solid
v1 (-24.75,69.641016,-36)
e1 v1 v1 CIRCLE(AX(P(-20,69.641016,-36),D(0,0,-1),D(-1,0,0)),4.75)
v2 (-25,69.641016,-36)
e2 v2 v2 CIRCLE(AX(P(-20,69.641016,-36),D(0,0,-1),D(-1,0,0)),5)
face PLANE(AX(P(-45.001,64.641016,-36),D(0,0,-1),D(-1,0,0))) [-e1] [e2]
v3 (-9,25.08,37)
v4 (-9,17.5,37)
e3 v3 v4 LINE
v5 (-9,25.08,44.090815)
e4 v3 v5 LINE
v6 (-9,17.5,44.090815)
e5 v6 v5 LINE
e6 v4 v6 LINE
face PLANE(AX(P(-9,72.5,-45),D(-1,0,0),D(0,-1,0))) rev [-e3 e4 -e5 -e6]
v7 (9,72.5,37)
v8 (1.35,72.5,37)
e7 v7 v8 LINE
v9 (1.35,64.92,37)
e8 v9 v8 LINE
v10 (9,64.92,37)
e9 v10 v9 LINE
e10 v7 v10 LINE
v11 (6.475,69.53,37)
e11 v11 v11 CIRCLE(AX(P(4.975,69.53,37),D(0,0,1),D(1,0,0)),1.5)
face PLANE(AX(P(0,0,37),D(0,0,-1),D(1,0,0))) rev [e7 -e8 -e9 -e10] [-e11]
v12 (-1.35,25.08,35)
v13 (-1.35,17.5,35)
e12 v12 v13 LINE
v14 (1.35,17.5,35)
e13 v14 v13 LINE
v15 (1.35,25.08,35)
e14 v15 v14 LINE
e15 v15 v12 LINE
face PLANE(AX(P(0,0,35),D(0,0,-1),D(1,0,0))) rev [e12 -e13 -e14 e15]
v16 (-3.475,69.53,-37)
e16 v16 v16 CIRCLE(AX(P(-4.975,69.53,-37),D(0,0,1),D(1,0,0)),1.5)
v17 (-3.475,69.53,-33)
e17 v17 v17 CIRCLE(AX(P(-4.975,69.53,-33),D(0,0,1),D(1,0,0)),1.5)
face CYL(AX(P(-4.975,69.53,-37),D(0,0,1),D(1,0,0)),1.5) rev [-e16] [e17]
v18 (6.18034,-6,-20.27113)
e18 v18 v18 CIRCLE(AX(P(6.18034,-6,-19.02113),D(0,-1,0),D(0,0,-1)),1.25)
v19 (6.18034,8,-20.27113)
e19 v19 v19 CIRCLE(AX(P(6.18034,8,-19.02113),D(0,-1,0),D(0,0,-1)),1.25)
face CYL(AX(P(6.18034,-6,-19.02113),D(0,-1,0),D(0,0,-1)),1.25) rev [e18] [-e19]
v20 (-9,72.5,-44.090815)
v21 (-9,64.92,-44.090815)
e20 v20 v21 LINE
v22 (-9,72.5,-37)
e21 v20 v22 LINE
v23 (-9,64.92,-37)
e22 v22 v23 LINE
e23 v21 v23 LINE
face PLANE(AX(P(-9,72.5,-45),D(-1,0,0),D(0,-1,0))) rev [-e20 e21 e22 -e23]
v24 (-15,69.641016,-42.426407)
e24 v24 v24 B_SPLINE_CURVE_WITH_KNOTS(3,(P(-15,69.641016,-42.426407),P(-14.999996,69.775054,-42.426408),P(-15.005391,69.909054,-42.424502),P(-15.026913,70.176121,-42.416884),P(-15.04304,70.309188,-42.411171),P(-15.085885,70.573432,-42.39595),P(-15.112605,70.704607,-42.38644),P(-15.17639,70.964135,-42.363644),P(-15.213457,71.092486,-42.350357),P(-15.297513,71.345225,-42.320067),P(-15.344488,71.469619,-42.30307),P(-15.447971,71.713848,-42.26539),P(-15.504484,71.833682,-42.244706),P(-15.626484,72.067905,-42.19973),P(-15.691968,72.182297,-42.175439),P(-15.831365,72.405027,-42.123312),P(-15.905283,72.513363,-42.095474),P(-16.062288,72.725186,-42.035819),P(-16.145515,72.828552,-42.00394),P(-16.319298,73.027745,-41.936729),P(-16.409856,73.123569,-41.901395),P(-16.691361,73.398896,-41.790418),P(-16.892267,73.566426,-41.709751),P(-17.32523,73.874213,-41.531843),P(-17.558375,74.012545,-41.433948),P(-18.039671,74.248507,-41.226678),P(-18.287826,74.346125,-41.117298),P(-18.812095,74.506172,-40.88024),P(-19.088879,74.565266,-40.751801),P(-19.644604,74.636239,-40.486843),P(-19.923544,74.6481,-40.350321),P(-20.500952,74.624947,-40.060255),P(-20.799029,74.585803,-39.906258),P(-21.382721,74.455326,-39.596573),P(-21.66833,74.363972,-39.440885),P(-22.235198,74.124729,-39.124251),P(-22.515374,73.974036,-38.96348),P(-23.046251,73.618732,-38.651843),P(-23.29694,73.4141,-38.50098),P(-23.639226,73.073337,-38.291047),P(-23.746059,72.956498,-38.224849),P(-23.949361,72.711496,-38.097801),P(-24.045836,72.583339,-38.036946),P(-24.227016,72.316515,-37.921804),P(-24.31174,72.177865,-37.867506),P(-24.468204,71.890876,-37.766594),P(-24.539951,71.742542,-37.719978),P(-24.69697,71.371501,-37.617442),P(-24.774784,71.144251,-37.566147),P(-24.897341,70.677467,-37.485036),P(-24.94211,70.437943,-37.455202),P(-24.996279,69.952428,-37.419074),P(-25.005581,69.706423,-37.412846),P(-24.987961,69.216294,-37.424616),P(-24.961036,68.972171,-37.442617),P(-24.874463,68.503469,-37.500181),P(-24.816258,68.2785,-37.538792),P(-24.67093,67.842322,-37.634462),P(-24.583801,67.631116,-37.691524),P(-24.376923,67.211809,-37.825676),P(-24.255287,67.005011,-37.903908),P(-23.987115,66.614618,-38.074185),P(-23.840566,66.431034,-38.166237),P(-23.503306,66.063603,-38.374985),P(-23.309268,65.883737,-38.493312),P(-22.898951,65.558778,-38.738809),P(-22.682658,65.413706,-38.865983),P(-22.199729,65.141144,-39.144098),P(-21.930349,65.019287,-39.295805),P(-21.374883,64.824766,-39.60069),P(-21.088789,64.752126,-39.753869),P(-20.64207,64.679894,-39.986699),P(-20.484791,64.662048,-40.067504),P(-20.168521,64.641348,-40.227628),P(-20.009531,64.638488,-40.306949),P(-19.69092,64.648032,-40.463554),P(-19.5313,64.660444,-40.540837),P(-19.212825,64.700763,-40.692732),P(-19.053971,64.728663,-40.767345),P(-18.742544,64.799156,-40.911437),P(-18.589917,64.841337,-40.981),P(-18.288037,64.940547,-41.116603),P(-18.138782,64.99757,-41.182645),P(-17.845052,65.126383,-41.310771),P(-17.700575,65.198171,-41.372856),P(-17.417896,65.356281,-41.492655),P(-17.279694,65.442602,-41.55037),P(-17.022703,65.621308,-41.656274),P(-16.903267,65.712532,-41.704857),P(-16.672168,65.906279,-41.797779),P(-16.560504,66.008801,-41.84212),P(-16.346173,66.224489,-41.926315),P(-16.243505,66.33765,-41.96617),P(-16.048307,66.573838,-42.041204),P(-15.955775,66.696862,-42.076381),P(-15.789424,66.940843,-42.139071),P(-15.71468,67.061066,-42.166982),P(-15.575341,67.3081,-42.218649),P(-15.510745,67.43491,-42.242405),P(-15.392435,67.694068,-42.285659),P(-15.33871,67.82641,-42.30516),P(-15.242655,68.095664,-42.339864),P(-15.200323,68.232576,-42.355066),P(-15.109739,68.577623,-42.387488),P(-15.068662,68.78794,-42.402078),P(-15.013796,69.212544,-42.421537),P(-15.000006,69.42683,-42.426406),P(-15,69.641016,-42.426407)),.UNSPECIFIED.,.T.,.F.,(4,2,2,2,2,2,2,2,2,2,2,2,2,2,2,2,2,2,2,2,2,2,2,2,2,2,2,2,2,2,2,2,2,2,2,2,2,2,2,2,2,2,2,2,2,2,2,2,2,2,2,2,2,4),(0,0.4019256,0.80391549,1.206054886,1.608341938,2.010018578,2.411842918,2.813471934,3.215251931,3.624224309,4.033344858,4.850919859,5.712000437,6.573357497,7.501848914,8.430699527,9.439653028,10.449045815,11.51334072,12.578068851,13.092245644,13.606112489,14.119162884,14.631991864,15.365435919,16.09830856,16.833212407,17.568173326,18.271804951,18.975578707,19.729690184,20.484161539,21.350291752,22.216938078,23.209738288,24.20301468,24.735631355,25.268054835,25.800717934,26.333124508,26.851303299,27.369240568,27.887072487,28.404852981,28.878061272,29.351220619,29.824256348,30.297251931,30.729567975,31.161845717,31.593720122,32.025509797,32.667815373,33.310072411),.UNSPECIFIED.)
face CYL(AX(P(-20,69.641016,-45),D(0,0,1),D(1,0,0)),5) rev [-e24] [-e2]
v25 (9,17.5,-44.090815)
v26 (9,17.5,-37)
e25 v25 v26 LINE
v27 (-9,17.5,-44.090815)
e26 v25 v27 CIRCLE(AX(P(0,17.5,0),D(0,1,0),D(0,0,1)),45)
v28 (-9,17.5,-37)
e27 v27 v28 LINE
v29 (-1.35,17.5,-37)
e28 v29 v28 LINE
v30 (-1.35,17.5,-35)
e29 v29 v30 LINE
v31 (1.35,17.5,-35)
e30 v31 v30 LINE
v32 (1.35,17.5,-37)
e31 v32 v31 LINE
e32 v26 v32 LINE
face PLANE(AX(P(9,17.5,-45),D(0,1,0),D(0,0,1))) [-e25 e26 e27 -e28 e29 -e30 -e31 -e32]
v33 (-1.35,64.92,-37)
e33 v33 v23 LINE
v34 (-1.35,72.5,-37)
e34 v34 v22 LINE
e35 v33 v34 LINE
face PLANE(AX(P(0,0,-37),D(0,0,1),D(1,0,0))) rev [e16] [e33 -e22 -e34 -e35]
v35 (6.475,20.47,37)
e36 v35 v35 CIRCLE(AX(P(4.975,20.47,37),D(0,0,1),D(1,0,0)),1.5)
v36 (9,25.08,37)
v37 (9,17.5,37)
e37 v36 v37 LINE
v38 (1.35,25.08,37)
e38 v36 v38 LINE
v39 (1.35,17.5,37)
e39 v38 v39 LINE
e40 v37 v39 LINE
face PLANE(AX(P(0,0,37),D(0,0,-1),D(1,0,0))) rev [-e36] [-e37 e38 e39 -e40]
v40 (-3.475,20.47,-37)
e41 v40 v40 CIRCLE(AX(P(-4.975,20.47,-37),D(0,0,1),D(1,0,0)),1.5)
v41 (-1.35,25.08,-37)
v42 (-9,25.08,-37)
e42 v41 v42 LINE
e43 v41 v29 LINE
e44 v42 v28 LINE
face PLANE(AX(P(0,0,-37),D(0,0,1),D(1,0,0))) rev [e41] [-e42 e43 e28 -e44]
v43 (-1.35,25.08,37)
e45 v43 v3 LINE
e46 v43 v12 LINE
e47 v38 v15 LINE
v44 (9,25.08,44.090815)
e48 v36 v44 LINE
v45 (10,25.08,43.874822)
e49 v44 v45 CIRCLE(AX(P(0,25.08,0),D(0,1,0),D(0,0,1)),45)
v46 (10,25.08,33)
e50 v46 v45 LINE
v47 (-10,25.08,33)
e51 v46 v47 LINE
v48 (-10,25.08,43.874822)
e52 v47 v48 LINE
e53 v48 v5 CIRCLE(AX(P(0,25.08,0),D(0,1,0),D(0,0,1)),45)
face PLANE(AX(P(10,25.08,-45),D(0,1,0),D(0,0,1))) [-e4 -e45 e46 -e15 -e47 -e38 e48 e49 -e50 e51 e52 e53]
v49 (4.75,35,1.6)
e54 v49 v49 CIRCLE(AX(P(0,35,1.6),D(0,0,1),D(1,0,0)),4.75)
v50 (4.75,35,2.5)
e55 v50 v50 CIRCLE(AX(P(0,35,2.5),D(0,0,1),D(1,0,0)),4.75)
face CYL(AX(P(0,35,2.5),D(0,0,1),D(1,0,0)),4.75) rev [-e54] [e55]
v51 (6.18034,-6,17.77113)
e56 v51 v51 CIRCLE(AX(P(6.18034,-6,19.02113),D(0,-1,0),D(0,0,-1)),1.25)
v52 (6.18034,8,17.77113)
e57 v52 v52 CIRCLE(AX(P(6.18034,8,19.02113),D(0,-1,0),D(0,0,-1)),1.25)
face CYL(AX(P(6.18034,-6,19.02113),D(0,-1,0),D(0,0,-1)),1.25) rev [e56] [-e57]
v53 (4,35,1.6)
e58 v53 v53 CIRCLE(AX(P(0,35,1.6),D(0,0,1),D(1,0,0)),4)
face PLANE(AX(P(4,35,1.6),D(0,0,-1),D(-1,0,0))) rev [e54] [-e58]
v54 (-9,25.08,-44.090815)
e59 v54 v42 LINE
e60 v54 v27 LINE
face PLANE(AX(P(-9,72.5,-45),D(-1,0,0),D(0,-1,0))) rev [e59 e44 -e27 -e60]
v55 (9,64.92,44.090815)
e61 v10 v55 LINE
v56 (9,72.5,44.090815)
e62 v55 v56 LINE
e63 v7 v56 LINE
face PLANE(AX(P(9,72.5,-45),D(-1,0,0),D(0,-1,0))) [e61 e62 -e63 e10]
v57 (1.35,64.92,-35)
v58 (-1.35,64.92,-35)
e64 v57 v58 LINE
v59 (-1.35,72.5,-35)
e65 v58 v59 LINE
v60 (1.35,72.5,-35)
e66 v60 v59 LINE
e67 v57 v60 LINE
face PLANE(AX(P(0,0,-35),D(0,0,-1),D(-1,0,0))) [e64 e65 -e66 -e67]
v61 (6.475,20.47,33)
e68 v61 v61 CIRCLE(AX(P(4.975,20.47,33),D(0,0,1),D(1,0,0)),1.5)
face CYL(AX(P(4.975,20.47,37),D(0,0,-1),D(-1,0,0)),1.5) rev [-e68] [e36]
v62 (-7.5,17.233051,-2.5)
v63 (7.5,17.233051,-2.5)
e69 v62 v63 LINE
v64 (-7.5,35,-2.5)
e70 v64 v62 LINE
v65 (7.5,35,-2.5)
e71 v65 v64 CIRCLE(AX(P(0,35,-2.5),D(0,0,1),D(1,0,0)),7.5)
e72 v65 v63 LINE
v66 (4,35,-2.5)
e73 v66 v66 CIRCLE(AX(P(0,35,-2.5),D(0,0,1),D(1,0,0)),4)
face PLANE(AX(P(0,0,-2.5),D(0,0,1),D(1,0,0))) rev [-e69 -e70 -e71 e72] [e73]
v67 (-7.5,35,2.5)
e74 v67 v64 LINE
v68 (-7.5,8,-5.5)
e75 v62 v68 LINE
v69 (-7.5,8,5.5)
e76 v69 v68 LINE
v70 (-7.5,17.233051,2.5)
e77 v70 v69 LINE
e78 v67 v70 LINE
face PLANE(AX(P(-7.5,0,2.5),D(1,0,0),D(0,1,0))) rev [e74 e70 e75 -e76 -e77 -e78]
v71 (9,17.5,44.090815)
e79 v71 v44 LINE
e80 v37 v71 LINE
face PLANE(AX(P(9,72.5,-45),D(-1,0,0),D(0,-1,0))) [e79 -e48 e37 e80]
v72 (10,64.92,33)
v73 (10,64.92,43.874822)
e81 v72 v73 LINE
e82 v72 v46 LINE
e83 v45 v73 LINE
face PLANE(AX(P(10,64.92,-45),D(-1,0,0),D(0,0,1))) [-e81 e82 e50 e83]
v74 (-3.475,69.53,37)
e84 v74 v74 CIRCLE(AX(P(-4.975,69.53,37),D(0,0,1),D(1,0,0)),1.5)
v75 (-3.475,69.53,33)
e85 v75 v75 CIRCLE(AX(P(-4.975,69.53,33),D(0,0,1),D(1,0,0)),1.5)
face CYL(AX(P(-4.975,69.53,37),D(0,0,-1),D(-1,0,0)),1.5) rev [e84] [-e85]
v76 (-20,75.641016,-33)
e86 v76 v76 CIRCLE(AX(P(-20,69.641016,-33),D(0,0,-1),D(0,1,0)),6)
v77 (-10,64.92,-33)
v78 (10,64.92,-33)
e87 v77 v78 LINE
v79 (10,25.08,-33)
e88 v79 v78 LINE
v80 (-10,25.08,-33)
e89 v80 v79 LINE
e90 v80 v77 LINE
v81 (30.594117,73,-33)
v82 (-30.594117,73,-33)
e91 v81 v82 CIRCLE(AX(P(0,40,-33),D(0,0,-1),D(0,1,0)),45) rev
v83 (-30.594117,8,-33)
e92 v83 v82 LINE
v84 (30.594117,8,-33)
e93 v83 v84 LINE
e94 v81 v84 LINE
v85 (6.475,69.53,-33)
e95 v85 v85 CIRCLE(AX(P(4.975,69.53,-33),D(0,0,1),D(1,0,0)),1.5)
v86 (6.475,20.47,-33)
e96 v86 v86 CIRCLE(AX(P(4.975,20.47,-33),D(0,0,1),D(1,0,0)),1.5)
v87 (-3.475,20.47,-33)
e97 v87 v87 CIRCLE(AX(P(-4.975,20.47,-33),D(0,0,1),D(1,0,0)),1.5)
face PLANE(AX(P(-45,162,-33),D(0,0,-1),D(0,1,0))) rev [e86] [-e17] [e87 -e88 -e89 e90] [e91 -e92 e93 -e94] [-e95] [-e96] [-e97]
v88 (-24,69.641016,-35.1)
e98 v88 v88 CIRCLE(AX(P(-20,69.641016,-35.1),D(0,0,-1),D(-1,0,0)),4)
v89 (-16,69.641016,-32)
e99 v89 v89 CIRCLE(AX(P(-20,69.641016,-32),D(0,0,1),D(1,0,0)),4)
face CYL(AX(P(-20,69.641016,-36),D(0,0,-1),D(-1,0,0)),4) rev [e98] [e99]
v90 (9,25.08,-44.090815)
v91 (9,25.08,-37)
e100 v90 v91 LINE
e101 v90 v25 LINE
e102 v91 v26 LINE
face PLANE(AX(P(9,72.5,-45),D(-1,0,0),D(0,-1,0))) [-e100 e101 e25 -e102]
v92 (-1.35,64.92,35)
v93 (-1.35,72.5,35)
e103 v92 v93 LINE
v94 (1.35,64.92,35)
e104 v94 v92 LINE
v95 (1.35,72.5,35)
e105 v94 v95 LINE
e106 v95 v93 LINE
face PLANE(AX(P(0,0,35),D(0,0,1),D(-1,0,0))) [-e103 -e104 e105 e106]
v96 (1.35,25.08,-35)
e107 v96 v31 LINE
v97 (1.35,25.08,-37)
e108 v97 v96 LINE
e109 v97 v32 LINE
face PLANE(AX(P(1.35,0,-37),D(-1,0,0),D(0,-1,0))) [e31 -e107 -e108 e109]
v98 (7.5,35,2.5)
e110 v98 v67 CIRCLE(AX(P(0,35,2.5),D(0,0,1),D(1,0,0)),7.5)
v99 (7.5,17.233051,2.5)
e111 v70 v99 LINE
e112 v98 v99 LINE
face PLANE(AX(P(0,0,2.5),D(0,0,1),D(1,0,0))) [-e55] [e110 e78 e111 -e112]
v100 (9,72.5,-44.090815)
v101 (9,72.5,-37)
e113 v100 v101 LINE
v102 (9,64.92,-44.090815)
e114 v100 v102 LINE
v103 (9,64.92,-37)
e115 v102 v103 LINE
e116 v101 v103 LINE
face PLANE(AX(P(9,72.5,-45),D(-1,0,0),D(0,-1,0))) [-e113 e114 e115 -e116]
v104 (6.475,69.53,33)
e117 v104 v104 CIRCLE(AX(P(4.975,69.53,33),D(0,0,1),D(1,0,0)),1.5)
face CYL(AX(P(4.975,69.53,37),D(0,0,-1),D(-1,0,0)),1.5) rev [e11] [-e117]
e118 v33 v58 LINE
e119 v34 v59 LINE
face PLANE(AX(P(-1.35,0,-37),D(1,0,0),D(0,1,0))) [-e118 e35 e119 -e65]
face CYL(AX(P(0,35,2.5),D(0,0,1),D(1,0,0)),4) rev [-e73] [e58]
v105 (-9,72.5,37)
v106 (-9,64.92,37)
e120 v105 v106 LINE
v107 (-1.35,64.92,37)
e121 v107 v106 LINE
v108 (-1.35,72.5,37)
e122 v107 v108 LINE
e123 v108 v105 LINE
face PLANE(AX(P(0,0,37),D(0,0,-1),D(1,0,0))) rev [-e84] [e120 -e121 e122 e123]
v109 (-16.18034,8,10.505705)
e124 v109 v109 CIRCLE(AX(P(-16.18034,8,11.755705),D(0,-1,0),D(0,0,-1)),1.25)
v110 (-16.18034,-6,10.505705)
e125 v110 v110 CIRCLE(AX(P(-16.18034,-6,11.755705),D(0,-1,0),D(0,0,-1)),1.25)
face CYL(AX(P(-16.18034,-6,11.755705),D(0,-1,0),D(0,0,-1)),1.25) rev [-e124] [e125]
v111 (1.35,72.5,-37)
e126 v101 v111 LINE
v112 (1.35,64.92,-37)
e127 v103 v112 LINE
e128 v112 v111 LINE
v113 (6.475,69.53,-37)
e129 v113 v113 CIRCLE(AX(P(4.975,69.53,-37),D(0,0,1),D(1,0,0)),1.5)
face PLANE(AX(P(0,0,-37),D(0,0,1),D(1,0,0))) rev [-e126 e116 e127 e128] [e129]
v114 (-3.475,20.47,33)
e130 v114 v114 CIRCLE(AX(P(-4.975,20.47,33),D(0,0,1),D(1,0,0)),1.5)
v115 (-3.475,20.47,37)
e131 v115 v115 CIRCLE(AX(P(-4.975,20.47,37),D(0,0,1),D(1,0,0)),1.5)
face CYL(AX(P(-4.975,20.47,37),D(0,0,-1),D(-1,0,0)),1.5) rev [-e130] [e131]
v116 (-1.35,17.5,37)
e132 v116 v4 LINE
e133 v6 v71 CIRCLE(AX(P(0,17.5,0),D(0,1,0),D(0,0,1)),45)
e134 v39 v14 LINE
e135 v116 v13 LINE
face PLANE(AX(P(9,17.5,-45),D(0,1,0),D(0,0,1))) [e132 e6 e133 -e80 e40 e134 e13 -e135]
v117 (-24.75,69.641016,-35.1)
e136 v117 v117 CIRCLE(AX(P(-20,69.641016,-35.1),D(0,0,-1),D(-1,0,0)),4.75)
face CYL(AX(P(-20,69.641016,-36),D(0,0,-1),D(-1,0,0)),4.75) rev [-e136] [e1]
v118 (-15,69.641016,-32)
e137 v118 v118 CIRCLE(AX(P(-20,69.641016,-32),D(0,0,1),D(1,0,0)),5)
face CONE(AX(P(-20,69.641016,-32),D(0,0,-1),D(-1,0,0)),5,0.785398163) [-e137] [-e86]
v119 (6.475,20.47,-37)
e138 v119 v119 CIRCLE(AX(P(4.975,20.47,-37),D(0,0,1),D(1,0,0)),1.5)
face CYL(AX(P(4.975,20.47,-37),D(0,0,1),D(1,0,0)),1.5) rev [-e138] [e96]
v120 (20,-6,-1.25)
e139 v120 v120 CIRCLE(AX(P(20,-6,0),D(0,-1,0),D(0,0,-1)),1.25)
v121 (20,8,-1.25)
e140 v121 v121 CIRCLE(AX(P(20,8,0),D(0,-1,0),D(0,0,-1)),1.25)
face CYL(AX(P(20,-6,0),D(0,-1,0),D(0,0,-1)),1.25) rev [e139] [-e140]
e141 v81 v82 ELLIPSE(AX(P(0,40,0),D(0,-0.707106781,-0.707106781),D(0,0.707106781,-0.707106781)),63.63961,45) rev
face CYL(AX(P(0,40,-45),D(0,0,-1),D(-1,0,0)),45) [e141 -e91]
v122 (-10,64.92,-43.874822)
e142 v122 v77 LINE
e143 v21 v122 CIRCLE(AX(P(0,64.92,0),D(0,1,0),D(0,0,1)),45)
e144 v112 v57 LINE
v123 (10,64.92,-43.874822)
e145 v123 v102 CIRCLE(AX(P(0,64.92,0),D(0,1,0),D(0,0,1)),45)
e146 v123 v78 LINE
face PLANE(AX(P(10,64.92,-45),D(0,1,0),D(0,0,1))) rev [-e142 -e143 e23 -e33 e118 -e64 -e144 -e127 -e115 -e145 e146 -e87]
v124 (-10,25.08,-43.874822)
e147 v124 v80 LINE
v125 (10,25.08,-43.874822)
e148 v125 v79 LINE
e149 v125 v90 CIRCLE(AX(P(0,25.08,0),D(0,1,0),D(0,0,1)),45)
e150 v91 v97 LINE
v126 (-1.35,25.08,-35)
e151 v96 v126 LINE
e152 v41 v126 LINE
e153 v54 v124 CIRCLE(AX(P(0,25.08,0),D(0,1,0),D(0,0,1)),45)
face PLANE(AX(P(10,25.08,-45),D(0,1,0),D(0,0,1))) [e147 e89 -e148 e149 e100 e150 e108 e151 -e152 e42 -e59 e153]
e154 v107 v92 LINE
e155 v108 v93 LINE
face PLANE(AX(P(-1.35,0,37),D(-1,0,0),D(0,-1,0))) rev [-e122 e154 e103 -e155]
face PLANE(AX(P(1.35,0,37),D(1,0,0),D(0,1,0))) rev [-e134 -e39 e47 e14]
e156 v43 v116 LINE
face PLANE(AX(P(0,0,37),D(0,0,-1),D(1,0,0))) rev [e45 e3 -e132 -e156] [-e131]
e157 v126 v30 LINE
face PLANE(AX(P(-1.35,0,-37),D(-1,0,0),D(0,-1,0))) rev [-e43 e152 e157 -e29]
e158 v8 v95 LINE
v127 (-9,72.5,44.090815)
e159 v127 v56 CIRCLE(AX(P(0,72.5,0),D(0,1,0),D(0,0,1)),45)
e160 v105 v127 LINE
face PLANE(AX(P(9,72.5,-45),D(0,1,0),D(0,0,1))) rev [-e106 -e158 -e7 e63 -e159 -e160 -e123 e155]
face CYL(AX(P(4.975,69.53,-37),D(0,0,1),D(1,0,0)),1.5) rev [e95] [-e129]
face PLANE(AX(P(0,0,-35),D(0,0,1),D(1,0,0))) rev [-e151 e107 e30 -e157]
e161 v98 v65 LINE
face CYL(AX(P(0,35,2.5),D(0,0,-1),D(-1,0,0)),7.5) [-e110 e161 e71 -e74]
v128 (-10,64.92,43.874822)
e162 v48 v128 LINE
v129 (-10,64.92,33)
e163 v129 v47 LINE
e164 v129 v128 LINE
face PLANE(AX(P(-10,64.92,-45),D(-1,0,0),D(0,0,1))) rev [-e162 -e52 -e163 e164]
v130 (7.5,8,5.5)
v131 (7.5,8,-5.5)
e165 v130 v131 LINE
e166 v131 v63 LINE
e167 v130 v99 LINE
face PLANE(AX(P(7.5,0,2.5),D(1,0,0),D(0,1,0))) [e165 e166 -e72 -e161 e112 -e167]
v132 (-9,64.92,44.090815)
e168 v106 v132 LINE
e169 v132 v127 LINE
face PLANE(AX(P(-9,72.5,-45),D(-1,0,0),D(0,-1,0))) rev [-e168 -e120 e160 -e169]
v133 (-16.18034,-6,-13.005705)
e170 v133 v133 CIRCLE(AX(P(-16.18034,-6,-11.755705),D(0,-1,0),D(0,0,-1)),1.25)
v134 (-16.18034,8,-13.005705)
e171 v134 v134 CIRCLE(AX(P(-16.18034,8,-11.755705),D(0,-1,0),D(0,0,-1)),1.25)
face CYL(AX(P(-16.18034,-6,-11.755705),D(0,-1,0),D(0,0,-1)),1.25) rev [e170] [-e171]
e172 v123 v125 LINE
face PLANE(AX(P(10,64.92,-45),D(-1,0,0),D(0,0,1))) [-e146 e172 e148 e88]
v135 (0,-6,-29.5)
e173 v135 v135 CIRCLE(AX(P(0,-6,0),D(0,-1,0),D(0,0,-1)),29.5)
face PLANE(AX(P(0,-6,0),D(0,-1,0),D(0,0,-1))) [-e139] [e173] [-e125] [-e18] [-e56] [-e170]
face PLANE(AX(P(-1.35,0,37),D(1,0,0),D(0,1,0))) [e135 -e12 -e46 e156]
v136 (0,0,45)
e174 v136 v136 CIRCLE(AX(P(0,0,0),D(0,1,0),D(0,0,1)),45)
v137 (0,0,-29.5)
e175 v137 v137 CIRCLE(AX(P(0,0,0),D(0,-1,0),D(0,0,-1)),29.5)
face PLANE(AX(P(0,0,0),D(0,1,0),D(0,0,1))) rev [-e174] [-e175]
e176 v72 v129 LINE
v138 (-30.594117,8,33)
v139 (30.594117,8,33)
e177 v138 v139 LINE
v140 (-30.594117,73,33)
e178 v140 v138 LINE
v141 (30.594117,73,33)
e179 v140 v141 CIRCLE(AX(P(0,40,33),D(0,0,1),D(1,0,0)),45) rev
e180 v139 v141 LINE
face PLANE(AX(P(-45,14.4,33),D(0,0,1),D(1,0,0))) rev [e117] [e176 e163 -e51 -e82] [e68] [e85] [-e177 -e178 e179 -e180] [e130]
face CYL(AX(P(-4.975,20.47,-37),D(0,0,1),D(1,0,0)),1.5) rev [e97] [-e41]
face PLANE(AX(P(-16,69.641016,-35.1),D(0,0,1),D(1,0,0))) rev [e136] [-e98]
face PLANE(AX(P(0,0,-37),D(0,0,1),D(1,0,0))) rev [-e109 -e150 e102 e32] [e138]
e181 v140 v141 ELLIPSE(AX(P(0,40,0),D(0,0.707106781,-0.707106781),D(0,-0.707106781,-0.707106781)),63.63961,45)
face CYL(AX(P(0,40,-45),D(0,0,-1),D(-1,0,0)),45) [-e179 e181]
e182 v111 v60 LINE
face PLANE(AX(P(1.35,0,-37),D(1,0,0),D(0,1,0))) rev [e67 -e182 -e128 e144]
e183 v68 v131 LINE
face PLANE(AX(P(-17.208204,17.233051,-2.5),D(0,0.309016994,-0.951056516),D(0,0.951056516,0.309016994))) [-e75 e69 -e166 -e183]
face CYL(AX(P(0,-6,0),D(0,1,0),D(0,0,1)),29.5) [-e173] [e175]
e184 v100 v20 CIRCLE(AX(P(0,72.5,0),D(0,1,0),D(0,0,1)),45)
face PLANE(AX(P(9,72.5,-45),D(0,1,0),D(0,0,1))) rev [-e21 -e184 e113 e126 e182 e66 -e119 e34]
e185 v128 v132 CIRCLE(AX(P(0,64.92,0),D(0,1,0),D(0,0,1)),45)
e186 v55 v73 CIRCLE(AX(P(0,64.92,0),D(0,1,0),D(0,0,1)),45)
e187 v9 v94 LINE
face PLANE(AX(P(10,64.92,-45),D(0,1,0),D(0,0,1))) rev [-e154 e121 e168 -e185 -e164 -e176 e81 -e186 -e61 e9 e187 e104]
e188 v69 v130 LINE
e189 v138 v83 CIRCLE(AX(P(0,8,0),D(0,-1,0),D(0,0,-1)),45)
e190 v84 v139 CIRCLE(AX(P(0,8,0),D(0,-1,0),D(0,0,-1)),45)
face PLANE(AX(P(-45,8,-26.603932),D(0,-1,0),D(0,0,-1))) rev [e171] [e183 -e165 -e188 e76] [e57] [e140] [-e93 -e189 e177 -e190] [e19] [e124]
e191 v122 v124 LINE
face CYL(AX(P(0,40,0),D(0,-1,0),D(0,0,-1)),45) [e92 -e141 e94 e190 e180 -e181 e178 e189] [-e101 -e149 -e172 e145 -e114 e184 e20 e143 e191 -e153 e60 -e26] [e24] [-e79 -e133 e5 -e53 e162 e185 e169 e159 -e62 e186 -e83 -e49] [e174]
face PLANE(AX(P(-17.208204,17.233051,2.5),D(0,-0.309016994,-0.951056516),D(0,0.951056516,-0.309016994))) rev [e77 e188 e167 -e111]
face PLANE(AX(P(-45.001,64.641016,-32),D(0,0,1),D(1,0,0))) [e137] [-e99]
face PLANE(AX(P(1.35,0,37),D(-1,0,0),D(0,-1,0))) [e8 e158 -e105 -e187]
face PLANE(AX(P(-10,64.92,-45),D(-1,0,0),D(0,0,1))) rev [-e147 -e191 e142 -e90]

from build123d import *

# Parameters (mm, degrees)
SKETCH_1_R                     = 45
EXTRUDE_1_DEPTH                = 40
REVOLVE_1_ANGLE                = 180
CUT_EXTRUDE_2_DEPTH            = 107.183802908
CUT_EXTRUDE_2_DEPTH_BACK       = 107.183802908
SKETCH_8_R                     = 29.5
EXTRUDE_2_DEPTH                = 6
CUT_EXTRUDE_5_DEPTH            = 124.830529354
CUT_EXTRUDE_5_DEPTH_BACK       = 124.830529354
SKETCH_9_W                     = 18
SKETCH_9_H                     = 55
SKETCH_9_W_2                   = 20
SKETCH_9_H_2                   = 39.84
SKETCH_9_4_W                   = 7.65
SKETCH_9_4_H                   = 7.58
SKETCH_9_4_R                   = 1.5
EXTRUDE_3_DEPTH                = 4
SKETCH_9_5_W                   = 2.7
SKETCH_9_5_H                   = 7.58
EXTRUDE_4_DEPTH                = 2
HOLE_WIZARD_M3_1_D             = 2.5
CUT_EXTRUDE_6_DEPTH            = 107.183802908
CUT_EXTRUDE_6_DEPTH_BACK       = 107.183802908
SKETCH_10_OUTSIDE_W            = 123.292
SKETCH_10_OUTSIDE_H            = 123.292
SKETCH_10_OUTSIDE_R            = 45
SKETCH_14_R                    = 2.5
EXTRUDE_5_DEPTH                = 2.5
EXTRUDE_6_DEPTH                = 15
HOLE_WIZARD_M3_1_2_D           = 8
HOLE_WIZARD_M3_1_2_CBORE_D     = 9.5
HOLE_WIZARD_M3_1_2_CBORE_DEPTH = 0.9
SKETCH_23_R                    = 5
CUT_EXTRUDE_8_DEPTH            = 124.830529354
EXTRUDE_START                  = -36
EXTRUDE_7_OUTLINE_R            = 5
EXTRUDE_7_DEPTH                = 4
HOLE_WIZARD_M5_1_D             = 8
HOLE_WIZARD_M5_1_DEPTH         = 10
HOLE_WIZARD_M5_1_CBORE_D       = 9.5
HOLE_WIZARD_M5_1_CBORE_DEPTH   = 0.9
HOLE_WIZARD_M5_1_TIP           = 2.403442476
CHAMFER_1_SIZE                 = 1


# Read off the part's stored shape, not the designer's step: 凸台-拉伸7
with BuildPart() as part:
    # 草图1 → 凸台-拉伸1 (new body)
    with BuildSketch(Plane(origin=(0, 0, 0), x_dir=(1, 0, 0), z_dir=(0, 1, 0))):
        with Locations(Location((0, 0, 0), (0, 0, 270))):
            Circle(SKETCH_1_R)
    extrude(amount=EXTRUDE_1_DEPTH)

    # 草图3 → 旋转1 (revolve)
    with BuildSketch(Plane(origin=(0, 40, 0), x_dir=(1, 0, 0), z_dir=(0, 1, 0))):
        with BuildLine():
            ThreePointArc((45, 0), (31.819805153, 31.819805153), (0, 45))
            Line((0, 45), (0, 0))
            Line((0, 0), (45, 0))
        make_face()
        with BuildLine():
            Line((45, 0), (0, 0))
            Line((0, 0), (0, -45))
            ThreePointArc((0, -45), (31.819805153, -31.819805153), (45, 0))
        make_face()
        with BuildLine():
            Line((45, 45), (0, 45))
            ThreePointArc((0, 45), (31.819805153, 31.819805153), (45, 0))
            Line((45, 0), (45, 45))
        make_face()
        with BuildLine():
            Line((45, -45), (45, 0))
            ThreePointArc((45, 0), (31.819805153, -31.819805153), (0, -45))
            Line((0, -45), (45, -45))
        make_face()
    revolve(axis=Axis((0, 40, -45), (0, 0, 1)), revolution_arc=REVOLVE_1_ANGLE)

    # 草图4 → 切除-拉伸2 (cut, two sides: drawn at the far end of the back side and taken through both)
    with BuildSketch(Plane(origin=(0, 0, 0), x_dir=(0, 0, -1), z_dir=(1, 0, 0)).offset(-CUT_EXTRUDE_2_DEPTH_BACK)):
        Polygon((33, 162), (-33, 162), (-33, 14.4), (-33, 8), (-26.603931708, 8), (26.603931708, 8), (33, 8), (33, 14.4), align=None)
    extrude(amount=CUT_EXTRUDE_2_DEPTH + CUT_EXTRUDE_2_DEPTH_BACK, mode=Mode.SUBTRACT)

    # 草图8 → 凸台-拉伸2 (add)
    with BuildSketch(Plane.XZ):
        with Locations(Location((0, 0, 0), (0, 0, 270))):
            Circle(SKETCH_8_R)
    extrude(amount=EXTRUDE_2_DEPTH)

    # 草图9 → 切除-拉伸5 (cut, two sides: drawn at the far end of the back side and taken through both)
    with BuildSketch(Plane.XY.offset(-33).offset(-CUT_EXTRUDE_5_DEPTH_BACK)):
        with Locations((0, 45)):
            Rectangle(SKETCH_9_W, SKETCH_9_H)
        with Locations((0, 45)):
            Rectangle(SKETCH_9_W_2, SKETCH_9_H_2)
    extrude(amount=CUT_EXTRUDE_5_DEPTH + CUT_EXTRUDE_5_DEPTH_BACK, mode=Mode.SUBTRACT)

    # 草图9<4> → 凸台-拉伸3 (add)
    # profile 1 of 4: a face of its own
    with BuildSketch(Plane.XY.offset(-33)):
        with Locations((5.175, 21.29)):
            Rectangle(SKETCH_9_4_W, SKETCH_9_4_H)
        with Locations((4.975, 20.47)):
            Circle(SKETCH_9_4_R, mode=Mode.SUBTRACT)
    # profile 2 of 4: a face of its own
    with BuildSketch(Plane.XY.offset(-33)):
        with Locations((-5.175, 21.29)):
            Rectangle(SKETCH_9_4_W, SKETCH_9_4_H)
        with Locations((-4.975, 20.47)):
            Circle(SKETCH_9_4_R, mode=Mode.SUBTRACT)
    # profile 3 of 4: a face of its own
    with BuildSketch(Plane.XY.offset(-33)):
        with Locations((5.175, 68.71)):
            Rectangle(SKETCH_9_4_W, SKETCH_9_4_H)
        with Locations((4.975, 69.53)):
            Circle(SKETCH_9_4_R, mode=Mode.SUBTRACT)
    # profile 4 of 4: a face of its own
    with BuildSketch(Plane.XY.offset(-33)):
        with Locations((-5.175, 68.71)):
            Rectangle(SKETCH_9_4_W, SKETCH_9_4_H)
        with Locations((-4.975, 69.53)):
            Circle(SKETCH_9_4_R, mode=Mode.SUBTRACT)
    extrude_3 = extrude(amount=-EXTRUDE_3_DEPTH)

    # 草图9<5> → 凸台-拉伸4 (add)
    with BuildSketch(Plane.XY.offset(-33)):
        with Locations((0, 21.29)):
            Rectangle(SKETCH_9_5_W, SKETCH_9_5_H)
        with Locations((0, 68.71)):
            Rectangle(SKETCH_9_5_W, SKETCH_9_5_H)
    extrude_4 = extrude(amount=-EXTRUDE_4_DEPTH)

    # 镜向1: 凸台-拉伸3, 凸台-拉伸4 across plane
    add(extrude_3.mirror(Plane.XY))
    add(extrude_4.mirror(Plane.XY))

    # Hole Wizard M3 _1 (through all)
    with Locations(Plane.XZ.offset(6)):
        with Locations((6.180339887, 19.021130326), (20, 0), (6.180339887, -19.021130326), (-16.180339887, -11.755705046), (-16.180339887, 11.755705046)):
            Hole(HOLE_WIZARD_M3_1_D / 2)

    # 草图10 outside → 切除-拉伸6 (cut, two sides: drawn at the far end of the back side and taken through both)
    with BuildSketch(Plane(origin=(0, 0, 0), x_dir=(1, 0, 0), z_dir=(0, 1, 0)).offset(-CUT_EXTRUDE_6_DEPTH_BACK)):
        Rectangle(SKETCH_10_OUTSIDE_W, SKETCH_10_OUTSIDE_H)
        with Locations(Location((0, 0, 0), (0, 0, 132.833428066))):
            Circle(SKETCH_10_OUTSIDE_R, mode=Mode.SUBTRACT)
    extrude(amount=CUT_EXTRUDE_6_DEPTH + CUT_EXTRUDE_6_DEPTH_BACK, mode=Mode.SUBTRACT)

    # 草图14 → 凸台-拉伸5 (add, symmetric)
    # profile 1 of 2: a face of its own
    with BuildSketch(Plane.XY):
        with BuildLine():
            Line((7.5, 35), (7.5, 8))
            Line((7.5, 8), (-7.5, 8))
            Line((-7.5, 8), (-7.5, 35))
            ThreePointArc((-7.5, 35), (0, 42.5), (7.5, 35))
        make_face()
        with Locations((0, 35)):
            Circle(SKETCH_14_R, mode=Mode.SUBTRACT)
    # profile 2 of 2: a face of its own
    with BuildSketch(Plane.XY):
        with Locations((0, 35)):
            Circle(SKETCH_14_R)
    extrude(amount=EXTRUDE_5_DEPTH, both=True)

    # 草图16 → 凸台-拉伸6 (add)
    with BuildSketch(Plane(origin=(7.5, 0, 0), x_dir=(0, 0, -1), z_dir=(1, 0, 0))):
        Polygon((2.5, 17.233050612), (5.5, 8), (2.5, 8), align=None)
    extrude_6 = extrude(amount=-EXTRUDE_6_DEPTH)

    # 镜向2: 凸台-拉伸6 across plane
    add(extrude_6.mirror(Plane.XY))

    # Hole Wizard M3 _1 2 (through all)
    with Locations(Plane.XY.offset(2.5)):
        with Locations((0, 35)):
            CounterBoreHole(HOLE_WIZARD_M3_1_2_D / 2, HOLE_WIZARD_M3_1_2_CBORE_D / 2, HOLE_WIZARD_M3_1_2_CBORE_DEPTH)

    # 草图23 → 切除-拉伸8 (cut, through all)
    with BuildSketch(Plane.XY.offset(-33)):
        with Locations((-20, 69.641016151)):
            Circle(SKETCH_23_R)
    extrude(amount=-CUT_EXTRUDE_8_DEPTH, mode=Mode.SUBTRACT)

    # 凸台-拉伸7 outline → 凸台-拉伸7 (add)
    with BuildSketch(Plane.XY.offset(EXTRUDE_START)):
        with Locations((-20, 69.641016151)):
            Circle(EXTRUDE_7_OUTLINE_R)
    extrude(amount=EXTRUDE_7_DEPTH)

    # M5 六角头螺栓的柱形沉头孔1
    with Locations(Plane(origin=(0, 0, -36), x_dir=(1, 0, 0), z_dir=(0, 0, -1))):
        with Locations((-20, -69.641016151)):
            CounterBoreHole(HOLE_WIZARD_M5_1_D / 2, HOLE_WIZARD_M5_1_CBORE_D / 2, HOLE_WIZARD_M5_1_CBORE_DEPTH, depth=HOLE_WIZARD_M5_1_DEPTH)
            with Locations((0, 0, -(HOLE_WIZARD_M5_1_DEPTH + HOLE_WIZARD_M5_1_TIP / 2))):  # 118° drill point
                Cone(0, HOLE_WIZARD_M5_1_D / 2, HOLE_WIZARD_M5_1_TIP, mode=Mode.SUBTRACT)

    # 倒角1
    chamfer_1_edges = [part.edges().sort_by_distance(p)[0] for p in [
        (-25, 69.641016151, -33),
    ]]
    chamfer(chamfer_1_edges, length=CHAMFER_1_SIZE - 0.0001)  # a hair under: the kernel refuses the full size


solid = part.part
